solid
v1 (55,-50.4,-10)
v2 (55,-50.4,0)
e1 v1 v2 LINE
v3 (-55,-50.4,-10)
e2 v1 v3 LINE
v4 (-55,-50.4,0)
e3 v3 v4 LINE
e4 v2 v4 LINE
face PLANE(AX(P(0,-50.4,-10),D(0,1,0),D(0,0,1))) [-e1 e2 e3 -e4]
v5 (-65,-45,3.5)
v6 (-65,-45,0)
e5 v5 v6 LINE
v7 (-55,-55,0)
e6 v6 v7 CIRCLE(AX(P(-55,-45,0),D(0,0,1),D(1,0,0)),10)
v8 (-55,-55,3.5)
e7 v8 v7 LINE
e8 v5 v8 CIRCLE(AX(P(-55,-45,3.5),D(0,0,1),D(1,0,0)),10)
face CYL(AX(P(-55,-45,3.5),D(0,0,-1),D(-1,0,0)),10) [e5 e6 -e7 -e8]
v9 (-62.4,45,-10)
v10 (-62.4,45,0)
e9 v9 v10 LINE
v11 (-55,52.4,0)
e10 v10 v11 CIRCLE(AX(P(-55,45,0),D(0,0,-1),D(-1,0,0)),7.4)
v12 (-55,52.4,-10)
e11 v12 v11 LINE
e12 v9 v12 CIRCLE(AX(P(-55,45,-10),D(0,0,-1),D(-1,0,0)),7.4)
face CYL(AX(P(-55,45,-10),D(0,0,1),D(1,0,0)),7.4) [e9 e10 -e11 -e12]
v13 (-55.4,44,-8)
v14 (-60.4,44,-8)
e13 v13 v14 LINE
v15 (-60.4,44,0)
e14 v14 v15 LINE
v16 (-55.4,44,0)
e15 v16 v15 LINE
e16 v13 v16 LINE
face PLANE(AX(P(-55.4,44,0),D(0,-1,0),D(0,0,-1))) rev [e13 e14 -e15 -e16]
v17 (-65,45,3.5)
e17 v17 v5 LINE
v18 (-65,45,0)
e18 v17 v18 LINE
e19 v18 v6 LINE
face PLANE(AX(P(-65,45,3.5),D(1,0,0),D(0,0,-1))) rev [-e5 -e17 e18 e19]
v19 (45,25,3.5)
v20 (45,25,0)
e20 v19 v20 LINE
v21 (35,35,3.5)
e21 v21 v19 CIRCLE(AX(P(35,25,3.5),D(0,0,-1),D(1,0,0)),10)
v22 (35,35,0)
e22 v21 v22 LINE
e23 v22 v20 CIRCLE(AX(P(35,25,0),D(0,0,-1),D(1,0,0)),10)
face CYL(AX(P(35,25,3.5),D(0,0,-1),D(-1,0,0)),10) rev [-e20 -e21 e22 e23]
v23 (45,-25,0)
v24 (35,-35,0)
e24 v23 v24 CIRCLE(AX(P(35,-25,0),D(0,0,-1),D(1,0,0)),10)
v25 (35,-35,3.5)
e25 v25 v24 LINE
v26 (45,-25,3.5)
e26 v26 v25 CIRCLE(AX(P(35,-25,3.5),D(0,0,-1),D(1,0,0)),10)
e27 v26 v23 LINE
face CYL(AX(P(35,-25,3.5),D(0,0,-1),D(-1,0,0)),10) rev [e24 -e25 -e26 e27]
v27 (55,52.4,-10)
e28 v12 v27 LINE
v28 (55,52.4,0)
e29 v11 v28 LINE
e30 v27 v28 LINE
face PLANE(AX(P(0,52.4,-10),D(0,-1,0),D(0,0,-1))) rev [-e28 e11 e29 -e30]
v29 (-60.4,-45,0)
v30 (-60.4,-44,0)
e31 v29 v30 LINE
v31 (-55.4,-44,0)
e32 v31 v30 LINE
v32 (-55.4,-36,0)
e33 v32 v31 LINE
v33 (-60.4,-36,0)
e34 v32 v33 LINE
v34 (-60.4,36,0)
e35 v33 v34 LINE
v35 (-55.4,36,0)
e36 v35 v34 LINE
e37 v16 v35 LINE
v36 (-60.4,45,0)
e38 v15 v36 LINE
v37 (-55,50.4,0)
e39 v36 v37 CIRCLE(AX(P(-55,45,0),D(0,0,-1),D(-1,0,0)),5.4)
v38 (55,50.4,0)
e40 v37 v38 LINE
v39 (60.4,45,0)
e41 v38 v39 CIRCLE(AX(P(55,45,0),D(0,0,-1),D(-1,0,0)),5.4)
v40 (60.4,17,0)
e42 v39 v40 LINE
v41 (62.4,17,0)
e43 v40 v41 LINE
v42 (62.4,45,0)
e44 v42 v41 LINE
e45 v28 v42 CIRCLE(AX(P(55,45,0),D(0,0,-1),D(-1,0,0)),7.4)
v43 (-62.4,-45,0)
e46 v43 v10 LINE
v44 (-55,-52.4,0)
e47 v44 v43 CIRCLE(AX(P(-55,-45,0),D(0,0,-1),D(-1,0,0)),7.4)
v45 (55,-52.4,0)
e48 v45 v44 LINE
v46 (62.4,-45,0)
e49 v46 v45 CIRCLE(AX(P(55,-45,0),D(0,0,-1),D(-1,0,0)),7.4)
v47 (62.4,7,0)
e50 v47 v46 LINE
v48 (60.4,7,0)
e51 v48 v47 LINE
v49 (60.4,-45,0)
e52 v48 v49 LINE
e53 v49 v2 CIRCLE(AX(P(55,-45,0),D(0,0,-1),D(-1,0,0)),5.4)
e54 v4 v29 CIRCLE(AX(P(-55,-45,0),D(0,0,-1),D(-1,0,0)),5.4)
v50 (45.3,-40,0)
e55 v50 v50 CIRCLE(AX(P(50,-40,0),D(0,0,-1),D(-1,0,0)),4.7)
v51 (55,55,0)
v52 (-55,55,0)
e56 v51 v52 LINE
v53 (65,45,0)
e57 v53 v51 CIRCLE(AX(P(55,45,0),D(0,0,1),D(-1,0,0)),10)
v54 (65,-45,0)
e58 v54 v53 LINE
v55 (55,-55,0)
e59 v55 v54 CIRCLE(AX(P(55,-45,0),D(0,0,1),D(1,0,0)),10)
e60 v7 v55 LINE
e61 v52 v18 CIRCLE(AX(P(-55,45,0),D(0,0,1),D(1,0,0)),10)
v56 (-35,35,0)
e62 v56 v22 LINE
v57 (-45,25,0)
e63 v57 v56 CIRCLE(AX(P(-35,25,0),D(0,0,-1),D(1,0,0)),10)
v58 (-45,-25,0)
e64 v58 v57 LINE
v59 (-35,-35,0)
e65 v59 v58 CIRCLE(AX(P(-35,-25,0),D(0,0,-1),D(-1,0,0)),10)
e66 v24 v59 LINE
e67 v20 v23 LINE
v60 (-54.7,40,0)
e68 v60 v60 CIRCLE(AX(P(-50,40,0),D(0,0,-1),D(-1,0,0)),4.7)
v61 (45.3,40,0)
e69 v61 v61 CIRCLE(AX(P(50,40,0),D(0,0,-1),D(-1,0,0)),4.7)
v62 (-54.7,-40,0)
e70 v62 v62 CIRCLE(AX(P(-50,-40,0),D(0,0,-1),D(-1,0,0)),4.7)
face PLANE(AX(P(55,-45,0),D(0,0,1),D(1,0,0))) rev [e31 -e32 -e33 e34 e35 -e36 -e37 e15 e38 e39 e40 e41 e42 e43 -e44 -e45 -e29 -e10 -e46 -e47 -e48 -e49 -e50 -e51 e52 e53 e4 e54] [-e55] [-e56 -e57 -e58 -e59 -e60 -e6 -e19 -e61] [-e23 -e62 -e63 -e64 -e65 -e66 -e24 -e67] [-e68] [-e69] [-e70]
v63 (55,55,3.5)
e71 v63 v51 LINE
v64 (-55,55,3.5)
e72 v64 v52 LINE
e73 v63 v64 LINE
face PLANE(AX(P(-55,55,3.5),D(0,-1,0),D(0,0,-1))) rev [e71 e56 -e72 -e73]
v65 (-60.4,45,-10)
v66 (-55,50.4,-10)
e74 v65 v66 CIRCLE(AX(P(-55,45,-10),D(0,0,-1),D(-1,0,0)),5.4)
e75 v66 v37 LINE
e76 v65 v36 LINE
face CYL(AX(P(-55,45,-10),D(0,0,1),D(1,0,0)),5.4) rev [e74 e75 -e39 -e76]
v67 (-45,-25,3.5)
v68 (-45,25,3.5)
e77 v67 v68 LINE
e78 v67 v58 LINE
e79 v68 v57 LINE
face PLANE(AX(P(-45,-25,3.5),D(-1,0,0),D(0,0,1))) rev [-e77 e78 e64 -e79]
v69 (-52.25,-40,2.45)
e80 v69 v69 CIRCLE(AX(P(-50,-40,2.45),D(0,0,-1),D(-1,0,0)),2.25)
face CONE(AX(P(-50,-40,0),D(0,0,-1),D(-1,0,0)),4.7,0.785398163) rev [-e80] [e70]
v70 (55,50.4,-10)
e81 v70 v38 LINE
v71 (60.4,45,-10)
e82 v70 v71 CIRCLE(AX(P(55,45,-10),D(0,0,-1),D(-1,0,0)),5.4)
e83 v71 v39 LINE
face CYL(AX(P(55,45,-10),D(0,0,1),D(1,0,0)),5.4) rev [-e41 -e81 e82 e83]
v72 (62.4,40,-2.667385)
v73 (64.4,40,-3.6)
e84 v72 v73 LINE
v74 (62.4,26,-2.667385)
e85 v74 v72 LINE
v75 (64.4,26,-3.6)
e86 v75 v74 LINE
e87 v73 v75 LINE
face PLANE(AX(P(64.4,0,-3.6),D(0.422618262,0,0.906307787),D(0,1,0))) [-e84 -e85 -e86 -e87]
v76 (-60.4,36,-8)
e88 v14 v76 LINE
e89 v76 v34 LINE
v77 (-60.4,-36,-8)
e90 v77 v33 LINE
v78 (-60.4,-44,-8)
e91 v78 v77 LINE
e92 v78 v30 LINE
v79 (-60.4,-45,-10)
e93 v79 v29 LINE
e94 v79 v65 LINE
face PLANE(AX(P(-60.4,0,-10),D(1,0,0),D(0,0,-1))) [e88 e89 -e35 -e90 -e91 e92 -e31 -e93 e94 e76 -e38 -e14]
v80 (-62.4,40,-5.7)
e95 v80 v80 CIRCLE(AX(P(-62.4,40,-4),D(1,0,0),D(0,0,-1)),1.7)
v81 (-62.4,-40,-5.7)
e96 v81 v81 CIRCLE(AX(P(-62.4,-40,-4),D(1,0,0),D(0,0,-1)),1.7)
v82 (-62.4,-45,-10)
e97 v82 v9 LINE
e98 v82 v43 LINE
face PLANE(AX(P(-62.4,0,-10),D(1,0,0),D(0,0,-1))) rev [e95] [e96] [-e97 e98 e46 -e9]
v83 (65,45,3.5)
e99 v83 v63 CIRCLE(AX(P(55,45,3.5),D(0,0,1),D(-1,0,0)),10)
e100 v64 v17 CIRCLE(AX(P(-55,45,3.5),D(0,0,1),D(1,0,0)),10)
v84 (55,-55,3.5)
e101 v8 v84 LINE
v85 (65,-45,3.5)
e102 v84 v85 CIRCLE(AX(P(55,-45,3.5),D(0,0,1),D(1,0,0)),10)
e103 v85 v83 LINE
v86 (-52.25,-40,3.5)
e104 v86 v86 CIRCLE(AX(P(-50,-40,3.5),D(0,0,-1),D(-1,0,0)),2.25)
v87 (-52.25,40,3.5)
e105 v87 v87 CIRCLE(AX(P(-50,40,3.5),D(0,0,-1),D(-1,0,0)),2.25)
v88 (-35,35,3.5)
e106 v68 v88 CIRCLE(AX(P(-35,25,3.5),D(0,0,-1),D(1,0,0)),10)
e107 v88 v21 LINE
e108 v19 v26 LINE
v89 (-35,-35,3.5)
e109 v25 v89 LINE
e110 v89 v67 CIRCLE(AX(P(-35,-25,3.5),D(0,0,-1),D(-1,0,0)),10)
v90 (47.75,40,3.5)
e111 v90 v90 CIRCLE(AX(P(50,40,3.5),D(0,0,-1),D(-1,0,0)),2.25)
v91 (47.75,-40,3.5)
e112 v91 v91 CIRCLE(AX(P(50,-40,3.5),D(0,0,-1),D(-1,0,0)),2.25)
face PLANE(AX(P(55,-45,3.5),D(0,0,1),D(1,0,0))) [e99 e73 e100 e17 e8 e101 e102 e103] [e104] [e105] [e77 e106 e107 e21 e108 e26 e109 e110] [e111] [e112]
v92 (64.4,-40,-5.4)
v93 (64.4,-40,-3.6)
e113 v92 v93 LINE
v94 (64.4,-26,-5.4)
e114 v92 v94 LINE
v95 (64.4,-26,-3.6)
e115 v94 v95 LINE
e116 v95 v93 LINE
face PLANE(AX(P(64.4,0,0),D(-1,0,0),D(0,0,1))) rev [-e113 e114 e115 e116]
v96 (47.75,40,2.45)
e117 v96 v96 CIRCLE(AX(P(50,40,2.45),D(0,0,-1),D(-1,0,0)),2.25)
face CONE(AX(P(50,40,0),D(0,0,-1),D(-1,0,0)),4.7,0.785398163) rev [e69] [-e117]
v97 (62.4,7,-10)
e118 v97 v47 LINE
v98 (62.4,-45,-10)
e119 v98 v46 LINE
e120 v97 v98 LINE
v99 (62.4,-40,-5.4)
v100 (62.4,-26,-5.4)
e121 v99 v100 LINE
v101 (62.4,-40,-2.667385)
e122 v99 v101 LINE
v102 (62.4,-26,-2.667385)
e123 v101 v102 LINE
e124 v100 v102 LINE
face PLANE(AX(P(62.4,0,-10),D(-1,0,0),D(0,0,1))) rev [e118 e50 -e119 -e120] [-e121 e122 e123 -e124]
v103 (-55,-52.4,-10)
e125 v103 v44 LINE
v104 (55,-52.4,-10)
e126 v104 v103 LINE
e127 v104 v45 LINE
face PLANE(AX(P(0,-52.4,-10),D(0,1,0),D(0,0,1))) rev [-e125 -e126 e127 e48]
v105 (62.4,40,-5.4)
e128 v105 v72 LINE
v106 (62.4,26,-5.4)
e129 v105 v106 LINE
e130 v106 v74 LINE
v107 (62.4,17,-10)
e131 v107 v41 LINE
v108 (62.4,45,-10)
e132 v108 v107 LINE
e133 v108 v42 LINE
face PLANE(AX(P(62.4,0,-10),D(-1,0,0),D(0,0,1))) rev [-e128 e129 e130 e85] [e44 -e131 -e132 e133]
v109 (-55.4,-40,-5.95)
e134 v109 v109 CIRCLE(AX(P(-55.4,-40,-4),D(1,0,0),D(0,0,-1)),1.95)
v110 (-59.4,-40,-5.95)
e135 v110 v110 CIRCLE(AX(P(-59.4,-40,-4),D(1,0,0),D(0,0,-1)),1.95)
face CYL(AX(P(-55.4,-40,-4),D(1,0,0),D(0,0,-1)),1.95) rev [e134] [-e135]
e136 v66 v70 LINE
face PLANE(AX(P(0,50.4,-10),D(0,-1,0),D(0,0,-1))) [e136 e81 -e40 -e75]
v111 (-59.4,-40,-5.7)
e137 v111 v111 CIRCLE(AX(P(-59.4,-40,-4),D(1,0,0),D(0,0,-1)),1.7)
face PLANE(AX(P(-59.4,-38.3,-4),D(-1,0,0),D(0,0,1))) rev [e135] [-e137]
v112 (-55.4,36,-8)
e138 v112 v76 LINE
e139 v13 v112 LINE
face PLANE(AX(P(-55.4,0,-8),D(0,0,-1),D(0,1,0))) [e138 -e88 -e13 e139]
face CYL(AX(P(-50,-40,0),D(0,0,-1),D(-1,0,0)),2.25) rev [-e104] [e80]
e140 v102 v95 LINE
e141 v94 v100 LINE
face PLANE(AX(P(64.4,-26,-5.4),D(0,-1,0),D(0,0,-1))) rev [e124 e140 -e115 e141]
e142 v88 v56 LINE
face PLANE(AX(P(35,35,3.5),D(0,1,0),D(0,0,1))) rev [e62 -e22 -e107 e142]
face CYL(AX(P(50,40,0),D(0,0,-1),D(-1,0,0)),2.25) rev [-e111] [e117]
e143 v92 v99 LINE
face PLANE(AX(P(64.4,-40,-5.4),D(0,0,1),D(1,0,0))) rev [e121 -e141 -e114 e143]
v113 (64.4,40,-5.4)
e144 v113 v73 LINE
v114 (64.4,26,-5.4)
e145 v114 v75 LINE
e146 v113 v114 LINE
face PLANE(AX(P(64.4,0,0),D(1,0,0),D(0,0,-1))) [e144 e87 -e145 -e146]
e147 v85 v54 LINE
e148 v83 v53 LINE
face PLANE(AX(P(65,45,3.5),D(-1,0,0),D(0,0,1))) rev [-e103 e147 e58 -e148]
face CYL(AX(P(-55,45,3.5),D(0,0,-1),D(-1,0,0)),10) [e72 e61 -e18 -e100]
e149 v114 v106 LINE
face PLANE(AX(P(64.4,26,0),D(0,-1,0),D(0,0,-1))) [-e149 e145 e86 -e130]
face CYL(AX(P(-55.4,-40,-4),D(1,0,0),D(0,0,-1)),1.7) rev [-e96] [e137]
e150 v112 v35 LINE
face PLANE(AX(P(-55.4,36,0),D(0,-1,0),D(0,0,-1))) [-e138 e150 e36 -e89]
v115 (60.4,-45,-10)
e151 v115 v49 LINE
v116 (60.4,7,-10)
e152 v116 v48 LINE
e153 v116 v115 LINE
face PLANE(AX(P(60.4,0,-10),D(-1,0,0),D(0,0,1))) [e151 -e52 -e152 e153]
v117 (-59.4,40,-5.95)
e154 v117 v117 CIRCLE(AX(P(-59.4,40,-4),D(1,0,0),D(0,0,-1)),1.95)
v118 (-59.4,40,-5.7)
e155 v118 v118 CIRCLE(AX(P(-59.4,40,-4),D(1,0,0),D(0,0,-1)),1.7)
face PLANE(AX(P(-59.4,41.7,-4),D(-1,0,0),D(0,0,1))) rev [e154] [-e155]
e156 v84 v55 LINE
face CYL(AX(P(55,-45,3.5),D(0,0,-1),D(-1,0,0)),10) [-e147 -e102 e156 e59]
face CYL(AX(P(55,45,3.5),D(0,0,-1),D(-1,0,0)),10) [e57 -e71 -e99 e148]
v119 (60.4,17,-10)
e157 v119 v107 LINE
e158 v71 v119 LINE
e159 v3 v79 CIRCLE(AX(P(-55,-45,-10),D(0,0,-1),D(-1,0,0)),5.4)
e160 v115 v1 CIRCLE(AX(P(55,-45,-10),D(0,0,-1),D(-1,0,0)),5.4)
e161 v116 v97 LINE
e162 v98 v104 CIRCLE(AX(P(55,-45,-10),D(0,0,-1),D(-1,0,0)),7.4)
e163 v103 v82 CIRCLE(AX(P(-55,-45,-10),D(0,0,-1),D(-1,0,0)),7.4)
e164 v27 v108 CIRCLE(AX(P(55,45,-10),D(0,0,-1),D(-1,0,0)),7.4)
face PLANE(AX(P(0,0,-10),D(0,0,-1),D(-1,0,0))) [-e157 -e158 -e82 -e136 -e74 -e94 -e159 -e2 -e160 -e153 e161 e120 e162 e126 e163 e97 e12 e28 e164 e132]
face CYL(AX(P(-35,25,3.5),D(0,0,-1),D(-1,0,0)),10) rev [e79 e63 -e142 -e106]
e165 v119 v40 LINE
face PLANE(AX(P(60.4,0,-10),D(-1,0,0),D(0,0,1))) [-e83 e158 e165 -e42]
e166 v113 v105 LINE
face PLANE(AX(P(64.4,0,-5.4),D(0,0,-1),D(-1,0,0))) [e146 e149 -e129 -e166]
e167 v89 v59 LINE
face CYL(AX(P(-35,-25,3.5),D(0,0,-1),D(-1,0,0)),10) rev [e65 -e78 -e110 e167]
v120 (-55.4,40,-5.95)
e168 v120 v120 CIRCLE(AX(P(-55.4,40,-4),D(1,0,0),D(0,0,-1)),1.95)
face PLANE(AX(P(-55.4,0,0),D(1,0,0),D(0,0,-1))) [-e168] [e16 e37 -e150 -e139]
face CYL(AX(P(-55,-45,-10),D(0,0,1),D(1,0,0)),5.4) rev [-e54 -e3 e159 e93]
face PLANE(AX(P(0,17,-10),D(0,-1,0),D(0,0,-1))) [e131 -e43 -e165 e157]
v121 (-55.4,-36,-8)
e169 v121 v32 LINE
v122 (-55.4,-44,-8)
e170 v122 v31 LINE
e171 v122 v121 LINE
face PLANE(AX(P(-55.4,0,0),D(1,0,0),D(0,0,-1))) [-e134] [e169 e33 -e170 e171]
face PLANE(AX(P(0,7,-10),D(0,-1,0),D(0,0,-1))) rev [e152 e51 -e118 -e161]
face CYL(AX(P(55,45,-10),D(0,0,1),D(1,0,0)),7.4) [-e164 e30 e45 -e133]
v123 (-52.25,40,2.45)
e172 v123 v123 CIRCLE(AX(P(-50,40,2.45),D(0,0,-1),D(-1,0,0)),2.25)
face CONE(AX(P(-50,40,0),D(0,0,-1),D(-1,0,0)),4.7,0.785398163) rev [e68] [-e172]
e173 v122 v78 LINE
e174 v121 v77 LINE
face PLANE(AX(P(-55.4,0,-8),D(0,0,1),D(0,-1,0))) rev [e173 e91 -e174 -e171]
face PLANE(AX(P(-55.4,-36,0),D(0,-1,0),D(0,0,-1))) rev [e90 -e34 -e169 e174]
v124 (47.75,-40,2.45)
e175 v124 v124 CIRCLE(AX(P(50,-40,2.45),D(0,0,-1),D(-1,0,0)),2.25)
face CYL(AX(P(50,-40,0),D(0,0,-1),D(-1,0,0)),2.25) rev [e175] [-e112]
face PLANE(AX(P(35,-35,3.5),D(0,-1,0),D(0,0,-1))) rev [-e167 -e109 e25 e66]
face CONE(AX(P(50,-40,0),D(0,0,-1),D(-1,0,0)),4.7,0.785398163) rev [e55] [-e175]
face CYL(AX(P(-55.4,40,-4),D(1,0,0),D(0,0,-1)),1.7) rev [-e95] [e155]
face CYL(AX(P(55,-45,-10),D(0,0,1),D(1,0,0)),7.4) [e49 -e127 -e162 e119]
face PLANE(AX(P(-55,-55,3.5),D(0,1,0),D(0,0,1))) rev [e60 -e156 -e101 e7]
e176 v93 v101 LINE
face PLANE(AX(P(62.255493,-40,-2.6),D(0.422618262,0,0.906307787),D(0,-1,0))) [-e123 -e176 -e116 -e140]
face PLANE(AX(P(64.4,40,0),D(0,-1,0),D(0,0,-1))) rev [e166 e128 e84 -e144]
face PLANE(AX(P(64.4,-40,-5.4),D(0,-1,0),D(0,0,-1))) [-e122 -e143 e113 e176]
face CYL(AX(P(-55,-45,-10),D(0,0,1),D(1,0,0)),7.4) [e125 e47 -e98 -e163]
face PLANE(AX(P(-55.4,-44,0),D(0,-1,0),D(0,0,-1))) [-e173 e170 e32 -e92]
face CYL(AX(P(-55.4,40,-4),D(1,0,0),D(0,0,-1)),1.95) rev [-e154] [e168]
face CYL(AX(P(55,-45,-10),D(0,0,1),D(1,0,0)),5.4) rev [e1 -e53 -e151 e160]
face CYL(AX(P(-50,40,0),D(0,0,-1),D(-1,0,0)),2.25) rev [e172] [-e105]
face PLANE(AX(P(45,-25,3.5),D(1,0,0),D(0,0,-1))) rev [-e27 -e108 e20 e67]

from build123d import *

# Parameters (mm, degrees)
P_IDAT_VYSUNUT_M2_DEPTH                           = 3.5
P_IDAT_VYSUNUT_M3_DEPTH                           = 10
V_LCOV_ZAHLOUBEN_PRO_M4_ROUBY_S_P_2_COUNT         = 2
V_LCOV_ZAHLOUBEN_PRO_M4_ROUBY_S_P_2_PITCH         = 100
V_LCOV_ZAHLOUBEN_PRO_M4_ROUBY_S_P_3_COUNT         = 2
V_LCOV_ZAHLOUBEN_PRO_M4_ROUBY_S_P_3_PITCH         = 128.062484749
V_LCOV_ZAHLOUBEN_PRO_M4_ROUBY_S_P_4_COUNT         = 2
V_LCOV_ZAHLOUBEN_PRO_M4_ROUBY_S_P_4_PITCH         = 80
ODEBRAT_VYSUNUT_M2_DEPTH                          = 86.732140997
SKICA8_W                                          = 5
SKICA8_H                                          = 8
SKICA8_W_2                                        = 3
SKICA8_W_3                                        = 8
P_IDAT_VYSUNUT_M4_DEPTH                           = 5
V_LCOV_ZAHLOUBEN_PRO_M3_ROUBY_S_V_LCO_D           = 3.4
V_LCOV_ZAHLOUBEN_PRO_M3_ROUBY_S_V_LCO_DEPTH       = 9.6
V_LCOV_ZAHLOUBEN_PRO_M3_ROUBY_S_V_LCO_CBORE_D     = 3.9
V_LCOV_ZAHLOUBEN_PRO_M3_ROUBY_S_V_LCO_CBORE_DEPTH = 4
SKICA15_W                                         = 2.8
SKICA15_H                                         = 14
P_IDAT_VYSUNUT_M5_DEPTH                           = 2
ZKOSEN_1_SIZE                                     = 2.144506921
ZKOSEN_1_SIZE_2                                   = 1
ZKOSEN_2_SIZE                                     = 1
ZKOSEN_2_SIZE_2                                   = 2.144506921


with BuildPart() as part:
    # Skica1 → Přidat vysunutím2 (new body)
    with BuildSketch(Plane.XY):
        with BuildLine():
            Line((-55, 55), (55, 55))
            ThreePointArc((55, 55), (62.071067812, 52.071067812), (65, 45))
            Line((65, 45), (65, -45))
            ThreePointArc((65, -45), (62.071067812, -52.071067812), (55, -55))
            Line((55, -55), (-55, -55))
            ThreePointArc((-55, -55), (-62.071067812, -52.071067812), (-65, -45))
            Line((-65, -45), (-65, 45))
            ThreePointArc((-65, 45), (-62.071067812, 52.071067812), (-55, 55))
        make_face()
    extrude(amount=P_IDAT_VYSUNUT_M2_DEPTH)

    # Skica3 → Přidat vysunutím3 (add)
    with BuildSketch(Plane(origin=(0, 0, 0), x_dir=(-1, 0, 0), z_dir=(0, 0, -1))):
        with BuildLine():
            Line((-60.4, 17), (-60.4, 45))
            ThreePointArc((-60.4, 45), (-58.818376618, 48.818376618), (-55, 50.4))
            Line((-55, 50.4), (55, 50.4))
            ThreePointArc((55, 50.4), (58.818376618, 48.818376618), (60.4, 45))
            Line((60.4, 45), (60.4, -45))
            ThreePointArc((60.4, -45), (58.818376618, -48.818376618), (55, -50.4))
            Line((55, -50.4), (-55, -50.4))
            ThreePointArc((-55, -50.4), (-58.818376618, -48.818376618), (-60.4, -45))
            Line((-60.4, -45), (-60.4, 7))
            Line((-60.4, 7), (-62.4, 7))
            Line((-62.4, 7), (-62.4, -45))
            ThreePointArc((-62.4, -45), (-60.232590181, -50.232590181), (-55, -52.4))
            Line((-55, -52.4), (55, -52.4))
            ThreePointArc((55, -52.4), (60.232590181, -50.232590181), (62.4, -45))
            Line((62.4, -45), (62.4, 45))
            ThreePointArc((62.4, 45), (60.232590181, 50.232590181), (55, 52.4))
            Line((55, 52.4), (-55, 52.4))
            ThreePointArc((-55, 52.4), (-60.232590181, 50.232590181), (-62.4, 45))
            Line((-62.4, 45), (-62.4, 17))
            Line((-62.4, 17), (-60.4, 17))
        make_face()
    extrude(amount=P_IDAT_VYSUNUT_M3_DEPTH)

    # Skica5 → Válcové zahloubení pro M4 šrouby s plochou hlavou1 (revolve, cut)
    with BuildSketch(Plane(origin=(-50, -40, 0), x_dir=(0, 1, 0), z_dir=(1, 0, 0))):
        Polygon((0, 0), (0, 3.5), (2.25, 3.5), (2.25, 2.45), (4.7, 0), align=None)
    v_lcov_zahlouben_pro_m4_rouby_s_ploch = revolve(axis=Axis((-50, -40, -6.35), (0, 0, 1)), mode=Mode.SUBTRACT)

    # V_lcov_ zahlouben_ pro M4 _rouby s p 2: Válcové zahloubení pro M4 šrouby s plochou hlavou1 ×2
    with Locations(*[(i * V_LCOV_ZAHLOUBEN_PRO_M4_ROUBY_S_P_2_PITCH, 0, 0) for i in range(1, V_LCOV_ZAHLOUBEN_PRO_M4_ROUBY_S_P_2_COUNT)]):
        add(v_lcov_zahlouben_pro_m4_rouby_s_ploch, mode=Mode.SUBTRACT)

    # V_lcov_ zahlouben_ pro M4 _rouby s p 3: Válcové zahloubení pro M4 šrouby s plochou hlavou1 ×2
    with Locations(*[Vector(0.7808688094430304, 0.6246950475544243, 0) * (i * V_LCOV_ZAHLOUBEN_PRO_M4_ROUBY_S_P_3_PITCH) for i in range(1, V_LCOV_ZAHLOUBEN_PRO_M4_ROUBY_S_P_3_COUNT)]):
        add(v_lcov_zahlouben_pro_m4_rouby_s_ploch, mode=Mode.SUBTRACT)

    # V_lcov_ zahlouben_ pro M4 _rouby s p 4: Válcové zahloubení pro M4 šrouby s plochou hlavou1 ×2
    with Locations(*[(0, i * V_LCOV_ZAHLOUBEN_PRO_M4_ROUBY_S_P_4_PITCH, 0) for i in range(1, V_LCOV_ZAHLOUBEN_PRO_M4_ROUBY_S_P_4_COUNT)]):
        add(v_lcov_zahlouben_pro_m4_rouby_s_ploch, mode=Mode.SUBTRACT)

    # Skica6 → Odebrat vysunutím2 (cut, through all)
    with BuildSketch(Plane(origin=(0, 0, 0), x_dir=(-1, 0, 0), z_dir=(0, 0, -1))):
        with BuildLine():
            Line((-35, -35), (35, -35))
            ThreePointArc((35, -35), (42.071067812, -32.071067812), (45, -25))
            Line((45, -25), (45, 25))
            ThreePointArc((45, 25), (42.071067812, 32.071067812), (35, 35))
            Line((35, 35), (-35, 35))
            ThreePointArc((-35, 35), (-42.071067812, 32.071067812), (-45, 25))
            Line((-45, 25), (-45, -25))
            ThreePointArc((-45, -25), (-42.071067812, -32.071067812), (-35, -35))
        make_face()
    extrude(amount=-ODEBRAT_VYSUNUT_M2_DEPTH, mode=Mode.SUBTRACT)

    # Skica8 → Přidat vysunutím4 (add)
    with BuildSketch(Plane(origin=(-60.4, 0, 0), x_dir=(0, 0, -1), z_dir=(1, 0, 0))):
        with Locations((2.5, 40)):
            Rectangle(SKICA8_W, SKICA8_H)
        with Locations((6.5, 40)):
            Rectangle(SKICA8_W_2, SKICA8_H)
        with Locations((4, -40)):
            Rectangle(SKICA8_W_3, SKICA8_H)
    extrude(amount=P_IDAT_VYSUNUT_M4_DEPTH)

    # Válcové zahloubení pro M3 šrouby s válcovou hlavou zaoblenou1
    with Locations(Plane(origin=(-55.4, 40, -4), x_dir=(0, 0, 1), z_dir=(1, 0, 0))):
        with Locations((0, 0)):
            v_lcov_zahlouben_pro_m3_rouby_s_v_lco = CounterBoreHole(V_LCOV_ZAHLOUBEN_PRO_M3_ROUBY_S_V_LCO_D / 2, V_LCOV_ZAHLOUBEN_PRO_M3_ROUBY_S_V_LCO_CBORE_D / 2, V_LCOV_ZAHLOUBEN_PRO_M3_ROUBY_S_V_LCO_CBORE_DEPTH, depth=V_LCOV_ZAHLOUBEN_PRO_M3_ROUBY_S_V_LCO_DEPTH)

    # Zrcadlit1: Válcové zahloubení pro M3 šrouby s válcovou hlavou zaoblenou1 across plane
    add(v_lcov_zahlouben_pro_m3_rouby_s_v_lco.mirror(Plane.ZX), mode=Mode.SUBTRACT)

    # Skica15 → Přidat vysunutím5 (add)
    with BuildSketch(Plane(origin=(62.4, 0, 0), x_dir=(0, 0, -1), z_dir=(1, 0, 0))):
        with Locations((4, 33)):
            Rectangle(SKICA15_W, SKICA15_H)
        with Locations((4, -33)):
            Rectangle(SKICA15_W, SKICA15_H)
    extrude(amount=P_IDAT_VYSUNUT_M5_DEPTH)

    # Zkosení1
    # the kernel refuses this chamfer: 2.144506921, 1 mm, written as the material it takes off along each edge
    with BuildSketch(Plane(origin=(64.4, -45.556364829, -2.6), x_dir=(-0.9998669641130703, 0, 0.016311164131110292), z_dir=(0, 1, 0))) as zkosen_1_piece_1_section:
        Polygon((ZKOSEN_1_SIZE * 0.999866963884, -ZKOSEN_1_SIZE * 0.0163111641274), (-ZKOSEN_1_SIZE_2 * 0.0163111641311, -ZKOSEN_1_SIZE_2 * 0.999866964113), (0, 0), align=None)
    zkosen_1_piece_1 = extrude(amount=25.112729659, mode=Mode.PRIVATE)
    zkosen_1_piece_1 = split(zkosen_1_piece_1, bisect_by=Plane(origin=(62.4, -33, -2.920893851), z_dir=(1, 0, 0)), keep=Keep.TOP, mode=Mode.PRIVATE)
    add(zkosen_1_piece_1, mode=Mode.SUBTRACT)

    # Zkosení2
    # the kernel refuses this chamfer: 2.144506921, 1 mm, written as the material it takes off along each edge
    with BuildSketch(Plane(origin=(64.4, 20.443635171, -2.6), x_dir=(0.07481330637059905, 0, -0.9971975577536776), z_dir=(0, 1, 0))) as zkosen_2_piece_1_section:
        Polygon((ZKOSEN_2_SIZE * 0.997197557754, ZKOSEN_2_SIZE * 0.0748133063706), (-ZKOSEN_2_SIZE_2 * 0.0748133063535, ZKOSEN_2_SIZE_2 * 0.997197557526), (0, 0), align=None)
    zkosen_2_piece_1 = extrude(amount=25.112729659, mode=Mode.PRIVATE)
    zkosen_2_piece_1 = split(zkosen_2_piece_1, bisect_by=Plane(origin=(62.4, 33, -2.920893851), z_dir=(1, 0, 0)), keep=Keep.TOP, mode=Mode.PRIVATE)
    add(zkosen_2_piece_1, mode=Mode.SUBTRACT)


solid = part.part
